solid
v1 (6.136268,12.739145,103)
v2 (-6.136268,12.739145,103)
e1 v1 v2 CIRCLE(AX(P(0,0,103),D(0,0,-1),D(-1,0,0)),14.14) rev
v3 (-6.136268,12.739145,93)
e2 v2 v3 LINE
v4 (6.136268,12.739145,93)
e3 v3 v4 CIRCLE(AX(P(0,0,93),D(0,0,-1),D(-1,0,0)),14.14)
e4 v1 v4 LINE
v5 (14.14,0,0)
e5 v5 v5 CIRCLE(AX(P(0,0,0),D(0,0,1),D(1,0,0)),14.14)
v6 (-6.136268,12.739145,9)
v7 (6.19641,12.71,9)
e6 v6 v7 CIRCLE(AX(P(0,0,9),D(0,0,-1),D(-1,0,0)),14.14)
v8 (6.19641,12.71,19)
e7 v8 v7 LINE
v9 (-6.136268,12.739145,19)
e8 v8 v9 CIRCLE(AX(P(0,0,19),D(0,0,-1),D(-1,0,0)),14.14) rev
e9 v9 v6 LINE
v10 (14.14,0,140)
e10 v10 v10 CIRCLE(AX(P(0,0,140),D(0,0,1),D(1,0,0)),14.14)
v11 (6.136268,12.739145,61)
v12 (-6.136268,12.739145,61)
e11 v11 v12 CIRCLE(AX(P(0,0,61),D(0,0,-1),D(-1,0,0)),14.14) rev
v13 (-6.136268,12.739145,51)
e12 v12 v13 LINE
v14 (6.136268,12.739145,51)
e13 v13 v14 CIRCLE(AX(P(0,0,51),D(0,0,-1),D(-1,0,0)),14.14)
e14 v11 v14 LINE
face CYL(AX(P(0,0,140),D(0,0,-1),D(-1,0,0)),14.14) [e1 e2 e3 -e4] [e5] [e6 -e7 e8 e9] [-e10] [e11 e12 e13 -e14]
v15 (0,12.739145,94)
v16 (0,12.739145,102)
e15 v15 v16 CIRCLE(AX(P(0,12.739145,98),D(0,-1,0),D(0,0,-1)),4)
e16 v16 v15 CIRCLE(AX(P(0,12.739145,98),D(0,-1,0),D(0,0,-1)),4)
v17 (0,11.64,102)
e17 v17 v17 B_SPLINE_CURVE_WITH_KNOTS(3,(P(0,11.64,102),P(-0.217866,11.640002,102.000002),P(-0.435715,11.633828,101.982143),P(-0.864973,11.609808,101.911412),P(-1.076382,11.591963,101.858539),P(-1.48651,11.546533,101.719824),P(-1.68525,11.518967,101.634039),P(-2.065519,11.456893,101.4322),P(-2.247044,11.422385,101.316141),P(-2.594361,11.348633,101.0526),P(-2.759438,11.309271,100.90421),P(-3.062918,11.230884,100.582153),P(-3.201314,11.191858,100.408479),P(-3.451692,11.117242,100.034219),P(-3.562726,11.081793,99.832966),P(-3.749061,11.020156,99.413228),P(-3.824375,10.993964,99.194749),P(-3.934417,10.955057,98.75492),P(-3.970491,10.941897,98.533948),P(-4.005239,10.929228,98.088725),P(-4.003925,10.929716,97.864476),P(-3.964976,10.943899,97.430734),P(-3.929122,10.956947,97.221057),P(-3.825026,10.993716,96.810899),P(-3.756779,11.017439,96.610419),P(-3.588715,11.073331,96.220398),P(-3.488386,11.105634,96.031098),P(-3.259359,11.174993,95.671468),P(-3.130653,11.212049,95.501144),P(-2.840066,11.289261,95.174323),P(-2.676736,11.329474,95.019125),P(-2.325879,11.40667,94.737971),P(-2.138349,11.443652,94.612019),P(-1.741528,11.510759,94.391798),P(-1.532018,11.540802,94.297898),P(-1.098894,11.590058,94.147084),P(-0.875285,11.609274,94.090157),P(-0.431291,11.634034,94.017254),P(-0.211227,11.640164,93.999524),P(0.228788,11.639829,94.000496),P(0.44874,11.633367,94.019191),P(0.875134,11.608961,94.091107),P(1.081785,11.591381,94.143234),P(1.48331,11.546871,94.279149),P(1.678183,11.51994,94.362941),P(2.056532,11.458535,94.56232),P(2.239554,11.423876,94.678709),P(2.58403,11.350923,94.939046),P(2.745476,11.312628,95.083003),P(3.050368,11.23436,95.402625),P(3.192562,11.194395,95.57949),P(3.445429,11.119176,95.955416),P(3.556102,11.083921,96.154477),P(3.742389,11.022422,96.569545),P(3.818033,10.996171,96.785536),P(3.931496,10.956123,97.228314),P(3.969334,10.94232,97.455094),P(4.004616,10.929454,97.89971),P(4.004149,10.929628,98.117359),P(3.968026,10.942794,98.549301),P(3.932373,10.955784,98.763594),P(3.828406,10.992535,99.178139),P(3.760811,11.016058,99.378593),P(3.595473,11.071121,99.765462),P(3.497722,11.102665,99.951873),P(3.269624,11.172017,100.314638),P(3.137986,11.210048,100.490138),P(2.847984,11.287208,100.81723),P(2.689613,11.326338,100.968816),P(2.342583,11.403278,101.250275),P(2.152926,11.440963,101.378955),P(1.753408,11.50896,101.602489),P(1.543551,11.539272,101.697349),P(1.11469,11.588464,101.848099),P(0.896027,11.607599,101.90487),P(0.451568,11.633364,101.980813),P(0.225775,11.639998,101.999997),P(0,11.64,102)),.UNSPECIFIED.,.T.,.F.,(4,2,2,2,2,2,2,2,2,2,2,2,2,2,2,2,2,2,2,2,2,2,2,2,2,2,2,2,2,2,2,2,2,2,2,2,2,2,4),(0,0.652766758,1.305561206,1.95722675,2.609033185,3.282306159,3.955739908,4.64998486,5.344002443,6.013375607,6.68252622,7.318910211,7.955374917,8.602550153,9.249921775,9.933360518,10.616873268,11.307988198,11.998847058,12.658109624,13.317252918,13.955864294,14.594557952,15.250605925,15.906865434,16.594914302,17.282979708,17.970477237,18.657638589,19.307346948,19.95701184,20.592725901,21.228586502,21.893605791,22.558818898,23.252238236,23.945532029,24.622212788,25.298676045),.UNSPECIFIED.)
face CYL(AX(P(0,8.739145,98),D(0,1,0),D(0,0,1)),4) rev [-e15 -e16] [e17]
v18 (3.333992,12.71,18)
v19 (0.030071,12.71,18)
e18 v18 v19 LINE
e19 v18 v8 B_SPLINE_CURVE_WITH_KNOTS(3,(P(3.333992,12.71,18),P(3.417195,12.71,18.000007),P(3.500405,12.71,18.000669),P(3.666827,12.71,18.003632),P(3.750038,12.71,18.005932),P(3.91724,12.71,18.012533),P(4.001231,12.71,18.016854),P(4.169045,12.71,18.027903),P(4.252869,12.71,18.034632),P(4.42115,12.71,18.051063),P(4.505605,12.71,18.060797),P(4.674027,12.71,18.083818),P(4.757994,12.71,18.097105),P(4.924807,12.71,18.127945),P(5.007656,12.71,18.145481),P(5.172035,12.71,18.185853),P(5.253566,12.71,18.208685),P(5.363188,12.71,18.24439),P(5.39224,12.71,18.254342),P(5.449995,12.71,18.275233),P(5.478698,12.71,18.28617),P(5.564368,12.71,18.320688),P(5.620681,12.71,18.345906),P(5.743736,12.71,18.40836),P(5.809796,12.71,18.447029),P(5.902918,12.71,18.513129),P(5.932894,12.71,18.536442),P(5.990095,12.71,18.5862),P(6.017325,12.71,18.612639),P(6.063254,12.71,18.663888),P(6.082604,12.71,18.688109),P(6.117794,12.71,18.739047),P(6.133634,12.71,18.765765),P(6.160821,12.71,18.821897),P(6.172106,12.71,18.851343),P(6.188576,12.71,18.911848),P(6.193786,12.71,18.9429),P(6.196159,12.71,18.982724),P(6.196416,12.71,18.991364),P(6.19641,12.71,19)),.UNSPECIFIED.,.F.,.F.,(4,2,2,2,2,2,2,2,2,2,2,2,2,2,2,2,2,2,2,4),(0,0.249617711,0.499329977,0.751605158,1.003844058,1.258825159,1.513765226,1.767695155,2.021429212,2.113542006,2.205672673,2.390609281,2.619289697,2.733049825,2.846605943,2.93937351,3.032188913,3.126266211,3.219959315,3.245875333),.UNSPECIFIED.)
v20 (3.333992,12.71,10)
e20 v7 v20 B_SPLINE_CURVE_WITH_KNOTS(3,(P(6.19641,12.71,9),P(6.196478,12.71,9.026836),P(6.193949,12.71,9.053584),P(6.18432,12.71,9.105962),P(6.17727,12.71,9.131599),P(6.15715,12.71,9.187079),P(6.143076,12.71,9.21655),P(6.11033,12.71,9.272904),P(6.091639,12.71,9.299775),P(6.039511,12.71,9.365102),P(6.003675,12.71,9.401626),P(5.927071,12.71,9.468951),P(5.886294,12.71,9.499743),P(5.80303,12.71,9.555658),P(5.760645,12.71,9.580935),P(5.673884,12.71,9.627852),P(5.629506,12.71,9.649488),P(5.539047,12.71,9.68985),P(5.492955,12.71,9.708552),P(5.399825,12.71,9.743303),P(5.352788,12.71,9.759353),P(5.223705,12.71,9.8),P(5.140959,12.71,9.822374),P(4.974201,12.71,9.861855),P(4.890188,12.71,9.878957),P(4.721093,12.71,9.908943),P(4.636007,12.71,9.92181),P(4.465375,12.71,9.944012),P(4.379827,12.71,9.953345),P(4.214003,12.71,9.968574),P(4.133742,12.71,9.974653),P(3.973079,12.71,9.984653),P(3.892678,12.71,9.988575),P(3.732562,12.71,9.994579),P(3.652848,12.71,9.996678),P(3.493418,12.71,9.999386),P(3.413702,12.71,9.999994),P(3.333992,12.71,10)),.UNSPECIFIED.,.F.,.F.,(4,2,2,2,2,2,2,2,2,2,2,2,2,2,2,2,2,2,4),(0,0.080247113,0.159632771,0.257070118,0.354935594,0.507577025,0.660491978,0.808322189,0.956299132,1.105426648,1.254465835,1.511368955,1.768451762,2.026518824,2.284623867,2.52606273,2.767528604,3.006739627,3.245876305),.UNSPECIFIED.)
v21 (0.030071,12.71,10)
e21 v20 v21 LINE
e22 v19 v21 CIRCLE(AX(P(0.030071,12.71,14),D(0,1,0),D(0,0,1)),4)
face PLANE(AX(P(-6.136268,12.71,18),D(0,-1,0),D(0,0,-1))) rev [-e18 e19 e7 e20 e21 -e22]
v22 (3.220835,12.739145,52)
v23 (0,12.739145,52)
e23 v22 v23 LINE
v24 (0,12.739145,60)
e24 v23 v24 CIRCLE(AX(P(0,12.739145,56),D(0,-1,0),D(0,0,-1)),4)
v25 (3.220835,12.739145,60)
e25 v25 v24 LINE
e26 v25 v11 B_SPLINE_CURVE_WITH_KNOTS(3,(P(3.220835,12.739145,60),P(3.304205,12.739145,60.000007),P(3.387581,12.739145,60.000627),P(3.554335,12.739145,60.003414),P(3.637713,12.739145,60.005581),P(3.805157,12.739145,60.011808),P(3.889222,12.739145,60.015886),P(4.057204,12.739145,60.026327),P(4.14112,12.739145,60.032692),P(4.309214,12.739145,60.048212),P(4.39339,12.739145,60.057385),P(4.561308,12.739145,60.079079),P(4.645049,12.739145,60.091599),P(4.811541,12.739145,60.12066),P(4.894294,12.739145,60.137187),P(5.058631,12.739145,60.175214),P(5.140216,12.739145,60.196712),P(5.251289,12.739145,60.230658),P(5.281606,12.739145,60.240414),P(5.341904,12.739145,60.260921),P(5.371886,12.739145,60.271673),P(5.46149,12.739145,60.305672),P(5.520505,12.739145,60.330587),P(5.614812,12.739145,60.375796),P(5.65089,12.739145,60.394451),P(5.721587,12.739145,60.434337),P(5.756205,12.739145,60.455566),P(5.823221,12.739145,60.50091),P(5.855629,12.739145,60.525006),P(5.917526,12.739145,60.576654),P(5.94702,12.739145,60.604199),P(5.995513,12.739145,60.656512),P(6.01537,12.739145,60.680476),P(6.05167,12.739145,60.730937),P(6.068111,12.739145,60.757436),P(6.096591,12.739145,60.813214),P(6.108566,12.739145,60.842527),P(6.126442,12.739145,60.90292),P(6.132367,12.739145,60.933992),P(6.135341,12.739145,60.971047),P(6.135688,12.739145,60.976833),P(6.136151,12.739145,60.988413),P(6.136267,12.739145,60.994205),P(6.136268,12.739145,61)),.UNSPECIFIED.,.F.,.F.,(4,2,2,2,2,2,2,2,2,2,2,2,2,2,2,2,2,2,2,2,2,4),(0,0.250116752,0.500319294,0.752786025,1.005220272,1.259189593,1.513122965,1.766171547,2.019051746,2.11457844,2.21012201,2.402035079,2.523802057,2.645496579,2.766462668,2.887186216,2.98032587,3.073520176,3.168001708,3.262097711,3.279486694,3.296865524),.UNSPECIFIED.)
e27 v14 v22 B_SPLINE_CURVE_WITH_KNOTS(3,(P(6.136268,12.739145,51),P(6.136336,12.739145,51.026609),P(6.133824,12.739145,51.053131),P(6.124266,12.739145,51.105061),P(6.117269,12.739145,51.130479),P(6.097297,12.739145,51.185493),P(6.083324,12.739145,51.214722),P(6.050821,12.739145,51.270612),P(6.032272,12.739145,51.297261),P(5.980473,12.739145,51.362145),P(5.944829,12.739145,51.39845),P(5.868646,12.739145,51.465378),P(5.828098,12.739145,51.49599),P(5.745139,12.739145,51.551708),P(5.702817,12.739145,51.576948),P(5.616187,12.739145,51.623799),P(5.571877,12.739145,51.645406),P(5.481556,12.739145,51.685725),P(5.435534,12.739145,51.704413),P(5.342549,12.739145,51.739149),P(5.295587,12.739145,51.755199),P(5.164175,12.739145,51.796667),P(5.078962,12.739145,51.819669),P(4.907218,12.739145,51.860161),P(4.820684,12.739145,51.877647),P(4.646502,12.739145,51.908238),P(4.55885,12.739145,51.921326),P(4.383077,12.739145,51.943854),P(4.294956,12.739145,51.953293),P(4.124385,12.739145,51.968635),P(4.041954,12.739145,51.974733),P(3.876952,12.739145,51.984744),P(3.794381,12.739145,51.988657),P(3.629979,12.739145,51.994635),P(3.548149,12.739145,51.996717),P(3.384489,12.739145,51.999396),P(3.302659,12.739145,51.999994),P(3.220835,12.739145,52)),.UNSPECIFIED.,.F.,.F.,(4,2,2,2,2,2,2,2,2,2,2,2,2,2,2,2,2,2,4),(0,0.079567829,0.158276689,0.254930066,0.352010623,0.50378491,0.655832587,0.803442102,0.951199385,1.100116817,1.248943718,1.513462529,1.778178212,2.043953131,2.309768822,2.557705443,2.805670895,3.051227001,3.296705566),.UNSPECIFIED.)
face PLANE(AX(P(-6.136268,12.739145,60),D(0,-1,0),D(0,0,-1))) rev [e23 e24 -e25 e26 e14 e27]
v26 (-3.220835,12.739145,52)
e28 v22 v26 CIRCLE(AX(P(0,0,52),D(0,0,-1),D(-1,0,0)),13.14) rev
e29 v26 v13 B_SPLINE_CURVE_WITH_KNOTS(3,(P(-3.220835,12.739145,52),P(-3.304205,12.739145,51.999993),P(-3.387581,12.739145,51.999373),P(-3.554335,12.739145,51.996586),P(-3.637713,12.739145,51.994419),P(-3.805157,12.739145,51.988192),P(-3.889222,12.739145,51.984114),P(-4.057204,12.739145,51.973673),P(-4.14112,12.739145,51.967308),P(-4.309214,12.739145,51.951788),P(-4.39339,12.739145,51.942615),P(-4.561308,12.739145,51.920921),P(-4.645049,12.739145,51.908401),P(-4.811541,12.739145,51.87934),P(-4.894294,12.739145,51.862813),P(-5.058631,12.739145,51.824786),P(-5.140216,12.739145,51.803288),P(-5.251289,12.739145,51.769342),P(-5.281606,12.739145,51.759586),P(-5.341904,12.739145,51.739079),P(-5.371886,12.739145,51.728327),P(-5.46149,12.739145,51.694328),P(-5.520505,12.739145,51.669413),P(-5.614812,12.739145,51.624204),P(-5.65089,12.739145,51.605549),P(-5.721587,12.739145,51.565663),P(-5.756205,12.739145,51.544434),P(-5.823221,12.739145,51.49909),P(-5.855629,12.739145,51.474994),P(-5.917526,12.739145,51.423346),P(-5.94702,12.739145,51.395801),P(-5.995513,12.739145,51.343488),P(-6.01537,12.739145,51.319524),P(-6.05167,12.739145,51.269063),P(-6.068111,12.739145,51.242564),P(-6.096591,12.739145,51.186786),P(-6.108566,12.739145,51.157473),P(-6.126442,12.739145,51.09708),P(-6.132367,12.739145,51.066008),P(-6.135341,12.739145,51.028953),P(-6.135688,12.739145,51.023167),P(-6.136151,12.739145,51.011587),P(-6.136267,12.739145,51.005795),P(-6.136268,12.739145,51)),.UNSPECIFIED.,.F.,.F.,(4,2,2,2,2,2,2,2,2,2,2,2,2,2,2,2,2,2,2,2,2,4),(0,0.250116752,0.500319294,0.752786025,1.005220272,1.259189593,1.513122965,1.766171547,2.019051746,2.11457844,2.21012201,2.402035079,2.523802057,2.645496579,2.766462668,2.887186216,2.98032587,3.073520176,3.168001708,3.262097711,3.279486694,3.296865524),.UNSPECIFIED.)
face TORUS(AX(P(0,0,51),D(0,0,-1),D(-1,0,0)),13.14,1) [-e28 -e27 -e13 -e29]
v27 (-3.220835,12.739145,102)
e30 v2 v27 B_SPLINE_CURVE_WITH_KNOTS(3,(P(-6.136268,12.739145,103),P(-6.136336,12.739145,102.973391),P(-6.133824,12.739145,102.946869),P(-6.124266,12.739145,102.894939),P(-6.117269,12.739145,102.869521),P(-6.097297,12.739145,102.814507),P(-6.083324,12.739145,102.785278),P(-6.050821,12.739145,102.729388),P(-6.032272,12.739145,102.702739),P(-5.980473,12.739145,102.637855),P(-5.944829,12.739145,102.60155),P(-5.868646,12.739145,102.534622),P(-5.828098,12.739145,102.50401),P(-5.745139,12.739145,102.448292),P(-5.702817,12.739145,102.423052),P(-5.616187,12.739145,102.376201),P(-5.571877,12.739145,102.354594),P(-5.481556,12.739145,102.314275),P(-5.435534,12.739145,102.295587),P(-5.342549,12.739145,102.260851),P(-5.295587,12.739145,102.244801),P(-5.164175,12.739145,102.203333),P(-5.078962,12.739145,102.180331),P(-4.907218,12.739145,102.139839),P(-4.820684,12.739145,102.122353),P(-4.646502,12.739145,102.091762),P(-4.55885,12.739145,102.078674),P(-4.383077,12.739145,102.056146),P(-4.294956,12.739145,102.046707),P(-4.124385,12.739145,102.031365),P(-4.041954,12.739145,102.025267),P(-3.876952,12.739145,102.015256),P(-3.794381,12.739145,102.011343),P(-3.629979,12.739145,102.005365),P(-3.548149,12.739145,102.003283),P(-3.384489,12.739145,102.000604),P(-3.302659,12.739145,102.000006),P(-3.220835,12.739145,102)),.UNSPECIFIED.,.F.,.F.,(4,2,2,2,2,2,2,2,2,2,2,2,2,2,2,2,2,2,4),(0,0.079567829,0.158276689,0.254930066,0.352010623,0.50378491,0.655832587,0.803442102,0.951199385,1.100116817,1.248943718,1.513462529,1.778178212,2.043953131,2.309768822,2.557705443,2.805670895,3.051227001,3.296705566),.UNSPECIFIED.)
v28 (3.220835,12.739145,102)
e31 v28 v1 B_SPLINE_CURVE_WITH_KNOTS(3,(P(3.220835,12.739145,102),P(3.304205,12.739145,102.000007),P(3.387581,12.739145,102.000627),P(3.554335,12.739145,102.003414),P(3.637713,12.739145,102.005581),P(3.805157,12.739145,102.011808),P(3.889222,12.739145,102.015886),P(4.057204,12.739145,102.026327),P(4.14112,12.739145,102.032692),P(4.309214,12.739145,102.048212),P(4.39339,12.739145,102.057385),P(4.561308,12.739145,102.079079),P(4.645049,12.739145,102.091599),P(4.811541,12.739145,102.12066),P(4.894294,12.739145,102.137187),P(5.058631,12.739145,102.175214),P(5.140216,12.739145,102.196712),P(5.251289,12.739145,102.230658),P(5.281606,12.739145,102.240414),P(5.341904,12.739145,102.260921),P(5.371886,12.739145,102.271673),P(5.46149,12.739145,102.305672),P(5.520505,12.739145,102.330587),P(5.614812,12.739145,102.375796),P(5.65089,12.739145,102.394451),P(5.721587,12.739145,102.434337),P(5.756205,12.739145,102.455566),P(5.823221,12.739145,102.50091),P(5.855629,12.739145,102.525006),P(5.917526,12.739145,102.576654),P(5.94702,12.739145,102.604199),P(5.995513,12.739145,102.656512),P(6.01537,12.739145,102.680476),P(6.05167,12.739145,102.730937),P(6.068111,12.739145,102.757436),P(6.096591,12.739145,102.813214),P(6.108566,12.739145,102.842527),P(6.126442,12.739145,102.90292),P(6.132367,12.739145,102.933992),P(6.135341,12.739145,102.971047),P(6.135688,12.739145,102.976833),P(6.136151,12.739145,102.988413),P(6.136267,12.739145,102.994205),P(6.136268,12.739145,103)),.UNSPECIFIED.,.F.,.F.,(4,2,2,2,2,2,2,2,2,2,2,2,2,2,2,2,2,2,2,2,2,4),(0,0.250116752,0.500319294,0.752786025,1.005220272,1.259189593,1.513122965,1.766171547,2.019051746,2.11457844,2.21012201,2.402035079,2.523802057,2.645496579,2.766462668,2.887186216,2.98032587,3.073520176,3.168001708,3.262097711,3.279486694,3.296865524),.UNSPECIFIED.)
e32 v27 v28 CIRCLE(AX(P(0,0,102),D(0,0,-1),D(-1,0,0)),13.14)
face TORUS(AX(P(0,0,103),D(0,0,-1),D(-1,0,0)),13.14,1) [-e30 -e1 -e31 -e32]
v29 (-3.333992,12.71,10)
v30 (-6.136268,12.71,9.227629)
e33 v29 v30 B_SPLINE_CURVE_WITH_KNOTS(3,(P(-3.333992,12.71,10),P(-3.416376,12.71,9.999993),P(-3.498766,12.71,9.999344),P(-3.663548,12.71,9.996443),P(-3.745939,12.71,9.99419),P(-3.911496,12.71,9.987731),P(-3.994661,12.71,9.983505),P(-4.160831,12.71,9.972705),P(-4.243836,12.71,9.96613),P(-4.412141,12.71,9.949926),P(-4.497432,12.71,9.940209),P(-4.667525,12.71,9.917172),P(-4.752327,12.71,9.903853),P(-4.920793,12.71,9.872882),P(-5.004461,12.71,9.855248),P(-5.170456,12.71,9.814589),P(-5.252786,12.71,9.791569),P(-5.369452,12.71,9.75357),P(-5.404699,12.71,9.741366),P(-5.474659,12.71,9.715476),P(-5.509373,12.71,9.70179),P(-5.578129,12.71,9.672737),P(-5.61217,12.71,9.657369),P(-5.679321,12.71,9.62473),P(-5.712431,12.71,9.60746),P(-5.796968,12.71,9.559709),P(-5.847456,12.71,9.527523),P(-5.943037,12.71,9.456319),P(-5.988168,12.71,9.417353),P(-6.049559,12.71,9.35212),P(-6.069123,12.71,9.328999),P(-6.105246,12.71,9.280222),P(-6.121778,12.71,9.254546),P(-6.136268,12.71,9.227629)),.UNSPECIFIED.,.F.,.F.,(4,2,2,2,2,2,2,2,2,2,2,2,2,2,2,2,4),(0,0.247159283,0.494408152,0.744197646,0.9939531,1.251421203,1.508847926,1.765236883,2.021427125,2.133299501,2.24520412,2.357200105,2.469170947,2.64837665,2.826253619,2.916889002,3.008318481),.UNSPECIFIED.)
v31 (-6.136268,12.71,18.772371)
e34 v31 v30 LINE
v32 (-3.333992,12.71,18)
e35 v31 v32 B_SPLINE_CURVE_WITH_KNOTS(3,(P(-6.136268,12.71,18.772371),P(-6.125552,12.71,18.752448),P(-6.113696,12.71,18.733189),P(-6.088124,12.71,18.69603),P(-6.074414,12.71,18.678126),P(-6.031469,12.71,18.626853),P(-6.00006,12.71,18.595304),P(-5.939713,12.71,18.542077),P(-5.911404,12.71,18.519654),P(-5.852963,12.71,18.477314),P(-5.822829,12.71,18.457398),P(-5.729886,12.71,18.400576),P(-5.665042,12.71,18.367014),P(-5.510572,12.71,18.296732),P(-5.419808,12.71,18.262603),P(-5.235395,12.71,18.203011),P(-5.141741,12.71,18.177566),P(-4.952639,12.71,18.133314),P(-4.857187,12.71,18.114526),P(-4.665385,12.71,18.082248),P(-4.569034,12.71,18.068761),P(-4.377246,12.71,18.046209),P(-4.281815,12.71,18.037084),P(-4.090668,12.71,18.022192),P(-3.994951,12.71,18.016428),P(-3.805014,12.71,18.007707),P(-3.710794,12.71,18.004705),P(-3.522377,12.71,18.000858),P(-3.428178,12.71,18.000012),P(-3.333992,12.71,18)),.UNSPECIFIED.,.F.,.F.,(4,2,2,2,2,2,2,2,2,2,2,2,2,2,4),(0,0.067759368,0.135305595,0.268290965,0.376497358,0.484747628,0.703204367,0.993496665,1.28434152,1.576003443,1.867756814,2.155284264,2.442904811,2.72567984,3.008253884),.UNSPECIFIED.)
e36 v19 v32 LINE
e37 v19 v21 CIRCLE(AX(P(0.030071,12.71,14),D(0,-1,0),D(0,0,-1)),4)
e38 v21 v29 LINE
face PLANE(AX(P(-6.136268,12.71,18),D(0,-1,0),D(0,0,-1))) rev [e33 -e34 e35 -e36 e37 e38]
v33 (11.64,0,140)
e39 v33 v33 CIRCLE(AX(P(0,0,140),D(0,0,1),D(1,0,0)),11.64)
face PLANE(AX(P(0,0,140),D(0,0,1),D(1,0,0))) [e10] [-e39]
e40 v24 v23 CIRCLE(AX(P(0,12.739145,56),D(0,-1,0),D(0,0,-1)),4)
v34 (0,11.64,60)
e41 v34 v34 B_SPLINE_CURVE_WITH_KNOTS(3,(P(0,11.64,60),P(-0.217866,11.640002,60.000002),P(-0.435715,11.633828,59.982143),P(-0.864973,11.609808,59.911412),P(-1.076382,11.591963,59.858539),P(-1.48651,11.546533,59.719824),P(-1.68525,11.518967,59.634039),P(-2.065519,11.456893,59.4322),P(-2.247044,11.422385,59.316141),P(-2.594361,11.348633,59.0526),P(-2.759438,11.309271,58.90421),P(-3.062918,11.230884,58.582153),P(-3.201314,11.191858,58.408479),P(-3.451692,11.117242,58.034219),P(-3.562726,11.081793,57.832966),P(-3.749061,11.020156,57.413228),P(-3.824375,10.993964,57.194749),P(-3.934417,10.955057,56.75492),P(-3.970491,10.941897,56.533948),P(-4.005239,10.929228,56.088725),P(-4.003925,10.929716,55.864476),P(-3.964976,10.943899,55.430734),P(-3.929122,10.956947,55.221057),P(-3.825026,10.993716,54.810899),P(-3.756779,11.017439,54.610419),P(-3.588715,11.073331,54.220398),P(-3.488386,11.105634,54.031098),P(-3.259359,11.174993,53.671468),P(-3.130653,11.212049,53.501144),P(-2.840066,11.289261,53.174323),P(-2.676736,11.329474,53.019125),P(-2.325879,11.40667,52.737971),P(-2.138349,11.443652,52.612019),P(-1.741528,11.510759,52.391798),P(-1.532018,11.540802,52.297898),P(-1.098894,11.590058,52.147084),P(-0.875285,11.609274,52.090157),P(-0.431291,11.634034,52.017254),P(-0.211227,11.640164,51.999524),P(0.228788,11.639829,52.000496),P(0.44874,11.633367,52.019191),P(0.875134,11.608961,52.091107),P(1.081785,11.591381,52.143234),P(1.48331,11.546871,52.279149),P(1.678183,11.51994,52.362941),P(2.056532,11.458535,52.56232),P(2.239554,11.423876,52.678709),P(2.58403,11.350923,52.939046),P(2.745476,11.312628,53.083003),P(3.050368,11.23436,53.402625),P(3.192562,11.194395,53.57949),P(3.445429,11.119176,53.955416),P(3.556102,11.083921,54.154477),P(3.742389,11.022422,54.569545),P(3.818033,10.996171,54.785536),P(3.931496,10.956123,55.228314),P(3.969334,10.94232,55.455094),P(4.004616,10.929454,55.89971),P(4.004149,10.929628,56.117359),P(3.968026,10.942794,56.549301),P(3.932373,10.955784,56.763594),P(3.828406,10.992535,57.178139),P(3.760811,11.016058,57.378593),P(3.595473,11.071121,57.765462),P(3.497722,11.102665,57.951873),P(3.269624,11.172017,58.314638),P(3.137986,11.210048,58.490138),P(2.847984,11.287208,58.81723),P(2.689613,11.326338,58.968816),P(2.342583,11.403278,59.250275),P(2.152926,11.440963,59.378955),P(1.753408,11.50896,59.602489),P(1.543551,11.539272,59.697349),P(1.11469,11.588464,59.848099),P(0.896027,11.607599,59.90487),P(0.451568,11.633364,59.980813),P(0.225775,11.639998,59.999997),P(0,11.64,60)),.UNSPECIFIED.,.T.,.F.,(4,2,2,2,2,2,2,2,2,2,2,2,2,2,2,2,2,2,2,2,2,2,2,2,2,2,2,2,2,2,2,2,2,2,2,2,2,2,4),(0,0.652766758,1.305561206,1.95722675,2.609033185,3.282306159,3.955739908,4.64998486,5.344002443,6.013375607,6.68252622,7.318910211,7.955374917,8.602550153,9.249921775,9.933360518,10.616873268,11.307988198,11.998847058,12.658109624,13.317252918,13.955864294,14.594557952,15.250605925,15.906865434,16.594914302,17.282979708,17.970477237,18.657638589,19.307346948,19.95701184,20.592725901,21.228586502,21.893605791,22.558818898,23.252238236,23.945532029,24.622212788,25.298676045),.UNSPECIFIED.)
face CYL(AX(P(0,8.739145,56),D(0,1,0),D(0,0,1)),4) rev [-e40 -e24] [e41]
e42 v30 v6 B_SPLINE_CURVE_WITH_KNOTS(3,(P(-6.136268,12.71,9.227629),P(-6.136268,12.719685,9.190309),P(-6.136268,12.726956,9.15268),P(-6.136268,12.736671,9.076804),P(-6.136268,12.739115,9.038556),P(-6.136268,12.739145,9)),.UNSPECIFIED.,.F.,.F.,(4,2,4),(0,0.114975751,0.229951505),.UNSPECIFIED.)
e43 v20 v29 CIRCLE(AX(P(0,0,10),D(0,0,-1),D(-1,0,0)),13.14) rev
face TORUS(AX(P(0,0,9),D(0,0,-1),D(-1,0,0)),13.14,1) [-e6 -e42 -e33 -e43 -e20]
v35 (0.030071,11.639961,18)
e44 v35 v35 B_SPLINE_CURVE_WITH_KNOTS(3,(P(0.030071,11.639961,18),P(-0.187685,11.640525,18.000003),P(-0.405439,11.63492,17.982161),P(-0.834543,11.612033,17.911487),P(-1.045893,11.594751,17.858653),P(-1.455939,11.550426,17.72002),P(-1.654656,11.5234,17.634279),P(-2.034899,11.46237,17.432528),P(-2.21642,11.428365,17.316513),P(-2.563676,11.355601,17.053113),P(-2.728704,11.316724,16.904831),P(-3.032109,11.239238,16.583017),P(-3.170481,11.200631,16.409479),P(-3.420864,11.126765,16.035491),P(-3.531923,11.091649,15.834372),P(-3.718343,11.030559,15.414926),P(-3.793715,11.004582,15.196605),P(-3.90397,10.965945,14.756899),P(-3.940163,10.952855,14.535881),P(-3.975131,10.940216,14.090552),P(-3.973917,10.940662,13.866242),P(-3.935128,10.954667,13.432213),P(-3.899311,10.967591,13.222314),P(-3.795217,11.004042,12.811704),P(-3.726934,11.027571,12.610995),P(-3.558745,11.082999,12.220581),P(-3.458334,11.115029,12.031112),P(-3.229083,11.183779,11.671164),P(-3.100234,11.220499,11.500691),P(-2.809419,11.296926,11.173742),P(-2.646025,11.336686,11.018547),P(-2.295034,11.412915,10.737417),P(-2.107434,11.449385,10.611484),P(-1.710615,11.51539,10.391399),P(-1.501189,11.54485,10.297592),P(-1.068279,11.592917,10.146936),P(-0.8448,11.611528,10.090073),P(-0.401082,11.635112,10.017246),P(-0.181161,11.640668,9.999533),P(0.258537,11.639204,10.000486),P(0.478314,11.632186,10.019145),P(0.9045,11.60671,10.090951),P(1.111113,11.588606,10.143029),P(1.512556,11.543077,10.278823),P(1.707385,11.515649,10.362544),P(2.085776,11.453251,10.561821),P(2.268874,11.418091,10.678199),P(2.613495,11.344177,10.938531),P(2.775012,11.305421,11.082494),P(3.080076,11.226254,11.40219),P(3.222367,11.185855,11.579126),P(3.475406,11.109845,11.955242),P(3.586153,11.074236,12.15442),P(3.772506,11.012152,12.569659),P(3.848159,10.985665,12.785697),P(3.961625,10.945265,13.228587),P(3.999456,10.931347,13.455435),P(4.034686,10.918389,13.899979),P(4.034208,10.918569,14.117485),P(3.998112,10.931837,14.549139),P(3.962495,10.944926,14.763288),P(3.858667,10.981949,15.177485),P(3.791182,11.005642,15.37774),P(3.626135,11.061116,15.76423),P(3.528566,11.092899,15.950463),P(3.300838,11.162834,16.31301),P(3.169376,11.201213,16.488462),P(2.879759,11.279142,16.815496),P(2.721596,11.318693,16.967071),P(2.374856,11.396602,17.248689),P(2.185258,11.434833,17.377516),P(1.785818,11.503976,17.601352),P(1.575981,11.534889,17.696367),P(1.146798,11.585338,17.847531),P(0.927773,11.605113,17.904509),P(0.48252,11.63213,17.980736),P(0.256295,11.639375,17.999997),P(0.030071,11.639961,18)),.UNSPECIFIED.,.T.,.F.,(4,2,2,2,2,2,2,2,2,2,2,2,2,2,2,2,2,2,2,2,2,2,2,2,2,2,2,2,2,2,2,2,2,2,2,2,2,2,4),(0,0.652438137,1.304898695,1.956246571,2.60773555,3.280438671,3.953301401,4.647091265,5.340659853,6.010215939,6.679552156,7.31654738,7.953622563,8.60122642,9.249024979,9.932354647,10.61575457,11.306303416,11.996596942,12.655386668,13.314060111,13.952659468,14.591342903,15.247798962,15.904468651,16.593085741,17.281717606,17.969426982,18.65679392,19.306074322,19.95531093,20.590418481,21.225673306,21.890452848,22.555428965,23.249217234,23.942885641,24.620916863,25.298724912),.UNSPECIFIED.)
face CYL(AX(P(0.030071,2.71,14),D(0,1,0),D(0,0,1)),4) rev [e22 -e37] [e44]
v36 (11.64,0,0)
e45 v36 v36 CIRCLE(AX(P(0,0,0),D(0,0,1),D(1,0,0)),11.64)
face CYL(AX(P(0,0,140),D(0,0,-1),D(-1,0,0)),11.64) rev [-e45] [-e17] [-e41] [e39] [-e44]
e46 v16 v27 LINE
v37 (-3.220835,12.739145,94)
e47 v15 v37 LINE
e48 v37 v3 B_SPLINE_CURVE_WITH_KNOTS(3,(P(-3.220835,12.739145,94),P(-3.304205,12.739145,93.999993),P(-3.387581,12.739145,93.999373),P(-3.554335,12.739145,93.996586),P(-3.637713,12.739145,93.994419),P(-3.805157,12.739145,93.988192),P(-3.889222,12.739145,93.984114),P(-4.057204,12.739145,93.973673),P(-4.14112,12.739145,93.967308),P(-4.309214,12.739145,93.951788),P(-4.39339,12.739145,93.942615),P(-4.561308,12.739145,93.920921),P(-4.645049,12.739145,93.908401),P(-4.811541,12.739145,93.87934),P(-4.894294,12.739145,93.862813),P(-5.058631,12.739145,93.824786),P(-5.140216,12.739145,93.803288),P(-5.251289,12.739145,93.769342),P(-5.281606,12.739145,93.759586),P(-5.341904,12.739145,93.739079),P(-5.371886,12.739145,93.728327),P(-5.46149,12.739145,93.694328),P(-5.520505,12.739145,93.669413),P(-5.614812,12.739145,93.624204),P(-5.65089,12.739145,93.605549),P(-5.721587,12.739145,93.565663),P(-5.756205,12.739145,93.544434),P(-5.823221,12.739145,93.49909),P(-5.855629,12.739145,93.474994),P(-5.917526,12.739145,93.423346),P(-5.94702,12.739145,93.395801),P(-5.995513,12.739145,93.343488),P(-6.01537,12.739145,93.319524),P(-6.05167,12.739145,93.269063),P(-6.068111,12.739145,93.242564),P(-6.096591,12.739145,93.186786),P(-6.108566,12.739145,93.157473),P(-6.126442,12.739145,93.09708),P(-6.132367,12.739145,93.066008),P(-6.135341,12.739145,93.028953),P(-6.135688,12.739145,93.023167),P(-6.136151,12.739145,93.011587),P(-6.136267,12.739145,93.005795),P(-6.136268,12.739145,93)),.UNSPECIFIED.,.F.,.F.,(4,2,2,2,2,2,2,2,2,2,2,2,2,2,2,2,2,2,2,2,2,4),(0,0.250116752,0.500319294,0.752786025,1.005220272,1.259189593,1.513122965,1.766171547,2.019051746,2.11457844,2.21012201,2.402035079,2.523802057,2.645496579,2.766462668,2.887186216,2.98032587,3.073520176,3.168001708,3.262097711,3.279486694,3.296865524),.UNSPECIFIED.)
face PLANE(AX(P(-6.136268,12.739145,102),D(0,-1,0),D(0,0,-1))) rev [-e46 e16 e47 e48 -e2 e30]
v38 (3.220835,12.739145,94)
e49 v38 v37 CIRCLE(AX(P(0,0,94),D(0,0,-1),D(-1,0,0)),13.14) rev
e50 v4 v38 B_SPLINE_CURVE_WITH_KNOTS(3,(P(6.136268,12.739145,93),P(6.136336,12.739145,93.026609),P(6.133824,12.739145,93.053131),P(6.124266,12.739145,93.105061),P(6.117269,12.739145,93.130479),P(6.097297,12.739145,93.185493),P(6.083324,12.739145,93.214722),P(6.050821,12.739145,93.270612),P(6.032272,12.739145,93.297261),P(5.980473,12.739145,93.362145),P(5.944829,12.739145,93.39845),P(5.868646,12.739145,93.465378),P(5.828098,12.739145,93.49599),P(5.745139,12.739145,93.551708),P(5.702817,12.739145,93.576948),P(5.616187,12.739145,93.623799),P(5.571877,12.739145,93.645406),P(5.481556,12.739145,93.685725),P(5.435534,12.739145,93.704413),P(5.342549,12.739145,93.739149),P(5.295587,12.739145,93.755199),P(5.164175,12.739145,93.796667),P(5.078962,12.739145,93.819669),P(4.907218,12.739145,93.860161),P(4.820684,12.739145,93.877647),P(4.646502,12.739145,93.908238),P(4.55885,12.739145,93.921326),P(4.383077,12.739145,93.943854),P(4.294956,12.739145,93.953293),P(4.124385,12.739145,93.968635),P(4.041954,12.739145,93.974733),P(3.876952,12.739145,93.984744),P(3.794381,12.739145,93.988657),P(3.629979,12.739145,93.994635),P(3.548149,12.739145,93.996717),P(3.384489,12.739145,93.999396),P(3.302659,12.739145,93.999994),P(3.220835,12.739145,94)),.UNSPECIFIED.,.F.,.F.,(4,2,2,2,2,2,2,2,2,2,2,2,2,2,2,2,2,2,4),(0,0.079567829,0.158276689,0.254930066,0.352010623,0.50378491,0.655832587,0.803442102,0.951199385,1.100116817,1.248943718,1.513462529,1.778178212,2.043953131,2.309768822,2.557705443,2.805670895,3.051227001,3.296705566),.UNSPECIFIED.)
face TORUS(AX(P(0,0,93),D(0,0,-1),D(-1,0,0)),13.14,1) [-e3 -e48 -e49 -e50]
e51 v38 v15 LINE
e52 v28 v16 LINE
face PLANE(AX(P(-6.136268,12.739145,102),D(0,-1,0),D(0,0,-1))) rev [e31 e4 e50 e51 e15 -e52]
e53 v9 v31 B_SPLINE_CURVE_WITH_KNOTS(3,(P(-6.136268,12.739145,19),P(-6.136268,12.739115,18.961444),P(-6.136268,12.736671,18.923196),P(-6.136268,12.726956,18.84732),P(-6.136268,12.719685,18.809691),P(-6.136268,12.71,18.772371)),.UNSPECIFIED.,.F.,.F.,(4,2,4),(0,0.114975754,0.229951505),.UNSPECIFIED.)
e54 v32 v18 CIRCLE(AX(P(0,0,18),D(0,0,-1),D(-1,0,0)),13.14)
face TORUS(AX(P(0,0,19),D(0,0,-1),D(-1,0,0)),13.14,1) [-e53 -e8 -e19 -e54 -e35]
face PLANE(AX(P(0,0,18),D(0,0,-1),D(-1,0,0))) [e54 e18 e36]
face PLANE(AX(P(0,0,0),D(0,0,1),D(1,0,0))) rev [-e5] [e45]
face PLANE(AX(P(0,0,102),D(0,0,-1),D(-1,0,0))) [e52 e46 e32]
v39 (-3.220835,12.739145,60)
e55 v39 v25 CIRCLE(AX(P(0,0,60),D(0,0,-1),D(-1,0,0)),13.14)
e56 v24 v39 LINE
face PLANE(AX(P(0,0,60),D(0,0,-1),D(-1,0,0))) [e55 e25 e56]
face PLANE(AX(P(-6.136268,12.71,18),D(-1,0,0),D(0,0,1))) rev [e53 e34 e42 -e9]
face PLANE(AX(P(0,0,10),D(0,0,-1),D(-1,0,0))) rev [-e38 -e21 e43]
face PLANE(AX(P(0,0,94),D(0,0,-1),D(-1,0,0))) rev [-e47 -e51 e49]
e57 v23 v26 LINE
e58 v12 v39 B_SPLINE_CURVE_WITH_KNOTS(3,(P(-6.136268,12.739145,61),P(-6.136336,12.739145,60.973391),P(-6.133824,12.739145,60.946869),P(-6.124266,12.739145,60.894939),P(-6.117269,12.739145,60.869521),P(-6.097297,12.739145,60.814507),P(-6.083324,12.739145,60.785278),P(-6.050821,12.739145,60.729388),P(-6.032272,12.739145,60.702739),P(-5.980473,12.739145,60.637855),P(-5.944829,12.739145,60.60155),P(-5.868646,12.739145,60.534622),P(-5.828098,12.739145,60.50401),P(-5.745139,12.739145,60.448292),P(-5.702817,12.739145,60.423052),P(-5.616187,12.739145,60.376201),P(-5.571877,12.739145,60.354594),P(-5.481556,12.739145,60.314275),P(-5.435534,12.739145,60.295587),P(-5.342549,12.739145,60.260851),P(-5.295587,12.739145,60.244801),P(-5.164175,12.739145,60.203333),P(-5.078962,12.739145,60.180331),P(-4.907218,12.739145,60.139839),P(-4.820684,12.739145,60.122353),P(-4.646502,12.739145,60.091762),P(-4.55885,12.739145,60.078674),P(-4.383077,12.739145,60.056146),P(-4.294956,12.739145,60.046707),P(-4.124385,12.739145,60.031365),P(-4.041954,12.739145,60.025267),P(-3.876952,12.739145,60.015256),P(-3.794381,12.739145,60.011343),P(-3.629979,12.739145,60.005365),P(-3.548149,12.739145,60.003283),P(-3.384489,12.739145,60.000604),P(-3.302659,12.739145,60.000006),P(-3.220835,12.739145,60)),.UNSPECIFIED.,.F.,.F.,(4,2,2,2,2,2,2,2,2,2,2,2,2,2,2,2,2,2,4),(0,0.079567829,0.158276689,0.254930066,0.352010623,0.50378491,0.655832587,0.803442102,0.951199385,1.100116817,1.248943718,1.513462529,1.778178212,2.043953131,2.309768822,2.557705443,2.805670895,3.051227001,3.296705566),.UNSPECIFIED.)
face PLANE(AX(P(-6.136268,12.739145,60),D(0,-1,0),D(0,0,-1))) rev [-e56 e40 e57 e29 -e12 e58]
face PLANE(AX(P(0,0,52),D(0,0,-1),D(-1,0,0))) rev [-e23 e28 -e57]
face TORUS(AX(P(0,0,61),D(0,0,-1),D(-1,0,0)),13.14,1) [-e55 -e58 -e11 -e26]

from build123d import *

# Parameters (mm, degrees)
SKETCH1_R              = 14.14
SKETCH1_R_2            = 11.64
BOSS_EXTRUDE1_DEPTH    = 140
SKETCH2_W              = 12.332677781
SKETCH2_H              = 2.901386509
CUT_EXTRUDE1_DEPTH     = 8
SKETCH3_R              = 4
CUT_EXTRUDE2_DEPTH     = 10
FILLET1_R              = 1
SKETCH4_W              = 12.27253506
SKETCH4_H              = 2.991853872
CUT_EXTRUDE3_DEPTH     = 4
SKETCH5_R              = 4
CUT_EXTRUDE4_DEPTH     = 4
FILLET2_R              = 1
LPATTERN1_COUNT        = 2
LPATTERN1_PITCH        = 42
FILLET2_OF_LPATTERN1_R = 1


with BuildPart() as part:
    # Sketch1 → Boss-Extrude1 (new body)
    with BuildSketch(Plane.XY):
        Circle(SKETCH1_R)
        Circle(SKETCH1_R_2, mode=Mode.SUBTRACT)
    extrude(amount=BOSS_EXTRUDE1_DEPTH)

    # Sketch2 → Cut-Extrude1 (cut)
    with BuildSketch(Plane(origin=(0, 0, 10), x_dir=(-1, 0, 0), z_dir=(0, 0, -1))):
        with Locations((-0.030071361, 14.160693254)):
            Rectangle(SKETCH2_W, SKETCH2_H)
    extrude(amount=-CUT_EXTRUDE1_DEPTH, mode=Mode.SUBTRACT)

    # Sketch3 → Cut-Extrude2 (cut)
    with BuildSketch(Plane(origin=(0, 12.71, 0), x_dir=(1, 0, 0), z_dir=(0, 1, 0))):
        with Locations(Location((0.030071361, -14, 0), (0, 0, 270))):
            Circle(SKETCH3_R)
    extrude(amount=-CUT_EXTRUDE2_DEPTH, mode=Mode.SUBTRACT)

    # Fillet1
    # the kernel refuses this fillet: 1 mm, written as the material it takes off along each edge
    with BuildSketch(Plane(origin=(0, 0, 10), x_dir=(-0.585677911723241, 0.8105438814274669, 0), z_dir=(-0.8105438814274669, -0.585677911723241, 0))) as fillet1_piece_1_section:
        with BuildLine():
            CenterArc((14.14 - FILLET1_R, FILLET1_R), FILLET1_R, 270, 90)
            Line((14.14 - FILLET1_R, 0), (14.14, 0))
            Line((14.14, 0), (14.14, FILLET1_R))
        make_face()
    fillet1_piece_1 = revolve(axis=Axis((0, 0, 10), (0, 0, -1)), revolution_arc=71.972599758, mode=Mode.PRIVATE)
    fillet1_piece_1 = split(fillet1_piece_1, bisect_by=Plane(origin=(0.026539027, 12.71, 9.717258604), z_dir=(0, 1, 0)), keep=Keep.TOP, mode=Mode.PRIVATE)
    fillet1_piece_1 = split(fillet1_piece_1, bisect_by=Plane(origin=(-6.13626753, 13.857233191, 9.717258604), z_dir=(1, 0, 0)), keep=Keep.TOP, mode=Mode.PRIVATE)
    add(fillet1_piece_1, mode=Mode.SUBTRACT)
    with BuildSketch(Plane(origin=(0, 0, 18), x_dir=(-0.585677911723241, 0.8105438814274669, 0), z_dir=(-0.8105438814274669, -0.585677911723241, 0))) as fillet1_piece_2_section:
        with BuildLine():
            CenterArc((14.14 - FILLET1_R, -FILLET1_R), FILLET1_R, 0, 90)
            Line((14.14 - FILLET1_R, 0), (14.14, 0))
            Line((14.14, 0), (14.14, -FILLET1_R))
        make_face()
    fillet1_piece_2 = revolve(axis=Axis((0, 0, 18), (0, 0, -1)), revolution_arc=71.972599758, mode=Mode.PRIVATE)
    fillet1_piece_2 = split(fillet1_piece_2, bisect_by=Plane(origin=(0.026539027, 12.71, 18.282741396), z_dir=(0, 1, 0)), keep=Keep.TOP, mode=Mode.PRIVATE)
    fillet1_piece_2 = split(fillet1_piece_2, bisect_by=Plane(origin=(-6.13626753, 13.857233191, 18.282741396), z_dir=(1, 0, 0)), keep=Keep.TOP, mode=Mode.PRIVATE)
    add(fillet1_piece_2, mode=Mode.SUBTRACT)

    # Sketch4 → Cut-Extrude3 (cut, symmetric)
    with BuildSketch(Plane(origin=(0, 0, 56), x_dir=(-1, 0, 0), z_dir=(0, 0, -1))):
        with Locations((0, 14.235072151)):
            Rectangle(SKETCH4_W, SKETCH4_H)
    cut_extrude3 = extrude(amount=CUT_EXTRUDE3_DEPTH, both=True, mode=Mode.SUBTRACT)

    # Sketch5 → Cut-Extrude4 (cut, symmetric)
    with BuildSketch(Plane(origin=(0, 12.739145215, 0), x_dir=(1, 0, 0), z_dir=(0, 1, 0))):
        with Locations(Location((0, -56, 0), (0, 0, 270))):
            Circle(SKETCH5_R)
    cut_extrude4 = extrude(amount=CUT_EXTRUDE4_DEPTH, both=True, mode=Mode.SUBTRACT)

    # Fillet2
    fillet2_edges = [part.edges().sort_by_distance(p)[0] for p in [
        (0, 14.14, 52),
        (0, 14.14, 60),
    ]]
    fillet(fillet2_edges, radius=FILLET2_R)

    # LPattern1: Cut-Extrude3, Cut-Extrude4 ×2
    with Locations(*[(0, 0, i * LPATTERN1_PITCH) for i in range(1, LPATTERN1_COUNT)]):
        add(cut_extrude3, mode=Mode.SUBTRACT)
        add(cut_extrude4, mode=Mode.SUBTRACT)

    # Fillet2 of LPattern1
    fillet2_of_lpattern1_edges = [part.edges().sort_by_distance(p)[0] for p in [
        (0, 14.14, 94),
        (0, 14.14, 102),
    ]]
    fillet(fillet2_of_lpattern1_edges, radius=FILLET2_OF_LPATTERN1_R)


solid = part.part
